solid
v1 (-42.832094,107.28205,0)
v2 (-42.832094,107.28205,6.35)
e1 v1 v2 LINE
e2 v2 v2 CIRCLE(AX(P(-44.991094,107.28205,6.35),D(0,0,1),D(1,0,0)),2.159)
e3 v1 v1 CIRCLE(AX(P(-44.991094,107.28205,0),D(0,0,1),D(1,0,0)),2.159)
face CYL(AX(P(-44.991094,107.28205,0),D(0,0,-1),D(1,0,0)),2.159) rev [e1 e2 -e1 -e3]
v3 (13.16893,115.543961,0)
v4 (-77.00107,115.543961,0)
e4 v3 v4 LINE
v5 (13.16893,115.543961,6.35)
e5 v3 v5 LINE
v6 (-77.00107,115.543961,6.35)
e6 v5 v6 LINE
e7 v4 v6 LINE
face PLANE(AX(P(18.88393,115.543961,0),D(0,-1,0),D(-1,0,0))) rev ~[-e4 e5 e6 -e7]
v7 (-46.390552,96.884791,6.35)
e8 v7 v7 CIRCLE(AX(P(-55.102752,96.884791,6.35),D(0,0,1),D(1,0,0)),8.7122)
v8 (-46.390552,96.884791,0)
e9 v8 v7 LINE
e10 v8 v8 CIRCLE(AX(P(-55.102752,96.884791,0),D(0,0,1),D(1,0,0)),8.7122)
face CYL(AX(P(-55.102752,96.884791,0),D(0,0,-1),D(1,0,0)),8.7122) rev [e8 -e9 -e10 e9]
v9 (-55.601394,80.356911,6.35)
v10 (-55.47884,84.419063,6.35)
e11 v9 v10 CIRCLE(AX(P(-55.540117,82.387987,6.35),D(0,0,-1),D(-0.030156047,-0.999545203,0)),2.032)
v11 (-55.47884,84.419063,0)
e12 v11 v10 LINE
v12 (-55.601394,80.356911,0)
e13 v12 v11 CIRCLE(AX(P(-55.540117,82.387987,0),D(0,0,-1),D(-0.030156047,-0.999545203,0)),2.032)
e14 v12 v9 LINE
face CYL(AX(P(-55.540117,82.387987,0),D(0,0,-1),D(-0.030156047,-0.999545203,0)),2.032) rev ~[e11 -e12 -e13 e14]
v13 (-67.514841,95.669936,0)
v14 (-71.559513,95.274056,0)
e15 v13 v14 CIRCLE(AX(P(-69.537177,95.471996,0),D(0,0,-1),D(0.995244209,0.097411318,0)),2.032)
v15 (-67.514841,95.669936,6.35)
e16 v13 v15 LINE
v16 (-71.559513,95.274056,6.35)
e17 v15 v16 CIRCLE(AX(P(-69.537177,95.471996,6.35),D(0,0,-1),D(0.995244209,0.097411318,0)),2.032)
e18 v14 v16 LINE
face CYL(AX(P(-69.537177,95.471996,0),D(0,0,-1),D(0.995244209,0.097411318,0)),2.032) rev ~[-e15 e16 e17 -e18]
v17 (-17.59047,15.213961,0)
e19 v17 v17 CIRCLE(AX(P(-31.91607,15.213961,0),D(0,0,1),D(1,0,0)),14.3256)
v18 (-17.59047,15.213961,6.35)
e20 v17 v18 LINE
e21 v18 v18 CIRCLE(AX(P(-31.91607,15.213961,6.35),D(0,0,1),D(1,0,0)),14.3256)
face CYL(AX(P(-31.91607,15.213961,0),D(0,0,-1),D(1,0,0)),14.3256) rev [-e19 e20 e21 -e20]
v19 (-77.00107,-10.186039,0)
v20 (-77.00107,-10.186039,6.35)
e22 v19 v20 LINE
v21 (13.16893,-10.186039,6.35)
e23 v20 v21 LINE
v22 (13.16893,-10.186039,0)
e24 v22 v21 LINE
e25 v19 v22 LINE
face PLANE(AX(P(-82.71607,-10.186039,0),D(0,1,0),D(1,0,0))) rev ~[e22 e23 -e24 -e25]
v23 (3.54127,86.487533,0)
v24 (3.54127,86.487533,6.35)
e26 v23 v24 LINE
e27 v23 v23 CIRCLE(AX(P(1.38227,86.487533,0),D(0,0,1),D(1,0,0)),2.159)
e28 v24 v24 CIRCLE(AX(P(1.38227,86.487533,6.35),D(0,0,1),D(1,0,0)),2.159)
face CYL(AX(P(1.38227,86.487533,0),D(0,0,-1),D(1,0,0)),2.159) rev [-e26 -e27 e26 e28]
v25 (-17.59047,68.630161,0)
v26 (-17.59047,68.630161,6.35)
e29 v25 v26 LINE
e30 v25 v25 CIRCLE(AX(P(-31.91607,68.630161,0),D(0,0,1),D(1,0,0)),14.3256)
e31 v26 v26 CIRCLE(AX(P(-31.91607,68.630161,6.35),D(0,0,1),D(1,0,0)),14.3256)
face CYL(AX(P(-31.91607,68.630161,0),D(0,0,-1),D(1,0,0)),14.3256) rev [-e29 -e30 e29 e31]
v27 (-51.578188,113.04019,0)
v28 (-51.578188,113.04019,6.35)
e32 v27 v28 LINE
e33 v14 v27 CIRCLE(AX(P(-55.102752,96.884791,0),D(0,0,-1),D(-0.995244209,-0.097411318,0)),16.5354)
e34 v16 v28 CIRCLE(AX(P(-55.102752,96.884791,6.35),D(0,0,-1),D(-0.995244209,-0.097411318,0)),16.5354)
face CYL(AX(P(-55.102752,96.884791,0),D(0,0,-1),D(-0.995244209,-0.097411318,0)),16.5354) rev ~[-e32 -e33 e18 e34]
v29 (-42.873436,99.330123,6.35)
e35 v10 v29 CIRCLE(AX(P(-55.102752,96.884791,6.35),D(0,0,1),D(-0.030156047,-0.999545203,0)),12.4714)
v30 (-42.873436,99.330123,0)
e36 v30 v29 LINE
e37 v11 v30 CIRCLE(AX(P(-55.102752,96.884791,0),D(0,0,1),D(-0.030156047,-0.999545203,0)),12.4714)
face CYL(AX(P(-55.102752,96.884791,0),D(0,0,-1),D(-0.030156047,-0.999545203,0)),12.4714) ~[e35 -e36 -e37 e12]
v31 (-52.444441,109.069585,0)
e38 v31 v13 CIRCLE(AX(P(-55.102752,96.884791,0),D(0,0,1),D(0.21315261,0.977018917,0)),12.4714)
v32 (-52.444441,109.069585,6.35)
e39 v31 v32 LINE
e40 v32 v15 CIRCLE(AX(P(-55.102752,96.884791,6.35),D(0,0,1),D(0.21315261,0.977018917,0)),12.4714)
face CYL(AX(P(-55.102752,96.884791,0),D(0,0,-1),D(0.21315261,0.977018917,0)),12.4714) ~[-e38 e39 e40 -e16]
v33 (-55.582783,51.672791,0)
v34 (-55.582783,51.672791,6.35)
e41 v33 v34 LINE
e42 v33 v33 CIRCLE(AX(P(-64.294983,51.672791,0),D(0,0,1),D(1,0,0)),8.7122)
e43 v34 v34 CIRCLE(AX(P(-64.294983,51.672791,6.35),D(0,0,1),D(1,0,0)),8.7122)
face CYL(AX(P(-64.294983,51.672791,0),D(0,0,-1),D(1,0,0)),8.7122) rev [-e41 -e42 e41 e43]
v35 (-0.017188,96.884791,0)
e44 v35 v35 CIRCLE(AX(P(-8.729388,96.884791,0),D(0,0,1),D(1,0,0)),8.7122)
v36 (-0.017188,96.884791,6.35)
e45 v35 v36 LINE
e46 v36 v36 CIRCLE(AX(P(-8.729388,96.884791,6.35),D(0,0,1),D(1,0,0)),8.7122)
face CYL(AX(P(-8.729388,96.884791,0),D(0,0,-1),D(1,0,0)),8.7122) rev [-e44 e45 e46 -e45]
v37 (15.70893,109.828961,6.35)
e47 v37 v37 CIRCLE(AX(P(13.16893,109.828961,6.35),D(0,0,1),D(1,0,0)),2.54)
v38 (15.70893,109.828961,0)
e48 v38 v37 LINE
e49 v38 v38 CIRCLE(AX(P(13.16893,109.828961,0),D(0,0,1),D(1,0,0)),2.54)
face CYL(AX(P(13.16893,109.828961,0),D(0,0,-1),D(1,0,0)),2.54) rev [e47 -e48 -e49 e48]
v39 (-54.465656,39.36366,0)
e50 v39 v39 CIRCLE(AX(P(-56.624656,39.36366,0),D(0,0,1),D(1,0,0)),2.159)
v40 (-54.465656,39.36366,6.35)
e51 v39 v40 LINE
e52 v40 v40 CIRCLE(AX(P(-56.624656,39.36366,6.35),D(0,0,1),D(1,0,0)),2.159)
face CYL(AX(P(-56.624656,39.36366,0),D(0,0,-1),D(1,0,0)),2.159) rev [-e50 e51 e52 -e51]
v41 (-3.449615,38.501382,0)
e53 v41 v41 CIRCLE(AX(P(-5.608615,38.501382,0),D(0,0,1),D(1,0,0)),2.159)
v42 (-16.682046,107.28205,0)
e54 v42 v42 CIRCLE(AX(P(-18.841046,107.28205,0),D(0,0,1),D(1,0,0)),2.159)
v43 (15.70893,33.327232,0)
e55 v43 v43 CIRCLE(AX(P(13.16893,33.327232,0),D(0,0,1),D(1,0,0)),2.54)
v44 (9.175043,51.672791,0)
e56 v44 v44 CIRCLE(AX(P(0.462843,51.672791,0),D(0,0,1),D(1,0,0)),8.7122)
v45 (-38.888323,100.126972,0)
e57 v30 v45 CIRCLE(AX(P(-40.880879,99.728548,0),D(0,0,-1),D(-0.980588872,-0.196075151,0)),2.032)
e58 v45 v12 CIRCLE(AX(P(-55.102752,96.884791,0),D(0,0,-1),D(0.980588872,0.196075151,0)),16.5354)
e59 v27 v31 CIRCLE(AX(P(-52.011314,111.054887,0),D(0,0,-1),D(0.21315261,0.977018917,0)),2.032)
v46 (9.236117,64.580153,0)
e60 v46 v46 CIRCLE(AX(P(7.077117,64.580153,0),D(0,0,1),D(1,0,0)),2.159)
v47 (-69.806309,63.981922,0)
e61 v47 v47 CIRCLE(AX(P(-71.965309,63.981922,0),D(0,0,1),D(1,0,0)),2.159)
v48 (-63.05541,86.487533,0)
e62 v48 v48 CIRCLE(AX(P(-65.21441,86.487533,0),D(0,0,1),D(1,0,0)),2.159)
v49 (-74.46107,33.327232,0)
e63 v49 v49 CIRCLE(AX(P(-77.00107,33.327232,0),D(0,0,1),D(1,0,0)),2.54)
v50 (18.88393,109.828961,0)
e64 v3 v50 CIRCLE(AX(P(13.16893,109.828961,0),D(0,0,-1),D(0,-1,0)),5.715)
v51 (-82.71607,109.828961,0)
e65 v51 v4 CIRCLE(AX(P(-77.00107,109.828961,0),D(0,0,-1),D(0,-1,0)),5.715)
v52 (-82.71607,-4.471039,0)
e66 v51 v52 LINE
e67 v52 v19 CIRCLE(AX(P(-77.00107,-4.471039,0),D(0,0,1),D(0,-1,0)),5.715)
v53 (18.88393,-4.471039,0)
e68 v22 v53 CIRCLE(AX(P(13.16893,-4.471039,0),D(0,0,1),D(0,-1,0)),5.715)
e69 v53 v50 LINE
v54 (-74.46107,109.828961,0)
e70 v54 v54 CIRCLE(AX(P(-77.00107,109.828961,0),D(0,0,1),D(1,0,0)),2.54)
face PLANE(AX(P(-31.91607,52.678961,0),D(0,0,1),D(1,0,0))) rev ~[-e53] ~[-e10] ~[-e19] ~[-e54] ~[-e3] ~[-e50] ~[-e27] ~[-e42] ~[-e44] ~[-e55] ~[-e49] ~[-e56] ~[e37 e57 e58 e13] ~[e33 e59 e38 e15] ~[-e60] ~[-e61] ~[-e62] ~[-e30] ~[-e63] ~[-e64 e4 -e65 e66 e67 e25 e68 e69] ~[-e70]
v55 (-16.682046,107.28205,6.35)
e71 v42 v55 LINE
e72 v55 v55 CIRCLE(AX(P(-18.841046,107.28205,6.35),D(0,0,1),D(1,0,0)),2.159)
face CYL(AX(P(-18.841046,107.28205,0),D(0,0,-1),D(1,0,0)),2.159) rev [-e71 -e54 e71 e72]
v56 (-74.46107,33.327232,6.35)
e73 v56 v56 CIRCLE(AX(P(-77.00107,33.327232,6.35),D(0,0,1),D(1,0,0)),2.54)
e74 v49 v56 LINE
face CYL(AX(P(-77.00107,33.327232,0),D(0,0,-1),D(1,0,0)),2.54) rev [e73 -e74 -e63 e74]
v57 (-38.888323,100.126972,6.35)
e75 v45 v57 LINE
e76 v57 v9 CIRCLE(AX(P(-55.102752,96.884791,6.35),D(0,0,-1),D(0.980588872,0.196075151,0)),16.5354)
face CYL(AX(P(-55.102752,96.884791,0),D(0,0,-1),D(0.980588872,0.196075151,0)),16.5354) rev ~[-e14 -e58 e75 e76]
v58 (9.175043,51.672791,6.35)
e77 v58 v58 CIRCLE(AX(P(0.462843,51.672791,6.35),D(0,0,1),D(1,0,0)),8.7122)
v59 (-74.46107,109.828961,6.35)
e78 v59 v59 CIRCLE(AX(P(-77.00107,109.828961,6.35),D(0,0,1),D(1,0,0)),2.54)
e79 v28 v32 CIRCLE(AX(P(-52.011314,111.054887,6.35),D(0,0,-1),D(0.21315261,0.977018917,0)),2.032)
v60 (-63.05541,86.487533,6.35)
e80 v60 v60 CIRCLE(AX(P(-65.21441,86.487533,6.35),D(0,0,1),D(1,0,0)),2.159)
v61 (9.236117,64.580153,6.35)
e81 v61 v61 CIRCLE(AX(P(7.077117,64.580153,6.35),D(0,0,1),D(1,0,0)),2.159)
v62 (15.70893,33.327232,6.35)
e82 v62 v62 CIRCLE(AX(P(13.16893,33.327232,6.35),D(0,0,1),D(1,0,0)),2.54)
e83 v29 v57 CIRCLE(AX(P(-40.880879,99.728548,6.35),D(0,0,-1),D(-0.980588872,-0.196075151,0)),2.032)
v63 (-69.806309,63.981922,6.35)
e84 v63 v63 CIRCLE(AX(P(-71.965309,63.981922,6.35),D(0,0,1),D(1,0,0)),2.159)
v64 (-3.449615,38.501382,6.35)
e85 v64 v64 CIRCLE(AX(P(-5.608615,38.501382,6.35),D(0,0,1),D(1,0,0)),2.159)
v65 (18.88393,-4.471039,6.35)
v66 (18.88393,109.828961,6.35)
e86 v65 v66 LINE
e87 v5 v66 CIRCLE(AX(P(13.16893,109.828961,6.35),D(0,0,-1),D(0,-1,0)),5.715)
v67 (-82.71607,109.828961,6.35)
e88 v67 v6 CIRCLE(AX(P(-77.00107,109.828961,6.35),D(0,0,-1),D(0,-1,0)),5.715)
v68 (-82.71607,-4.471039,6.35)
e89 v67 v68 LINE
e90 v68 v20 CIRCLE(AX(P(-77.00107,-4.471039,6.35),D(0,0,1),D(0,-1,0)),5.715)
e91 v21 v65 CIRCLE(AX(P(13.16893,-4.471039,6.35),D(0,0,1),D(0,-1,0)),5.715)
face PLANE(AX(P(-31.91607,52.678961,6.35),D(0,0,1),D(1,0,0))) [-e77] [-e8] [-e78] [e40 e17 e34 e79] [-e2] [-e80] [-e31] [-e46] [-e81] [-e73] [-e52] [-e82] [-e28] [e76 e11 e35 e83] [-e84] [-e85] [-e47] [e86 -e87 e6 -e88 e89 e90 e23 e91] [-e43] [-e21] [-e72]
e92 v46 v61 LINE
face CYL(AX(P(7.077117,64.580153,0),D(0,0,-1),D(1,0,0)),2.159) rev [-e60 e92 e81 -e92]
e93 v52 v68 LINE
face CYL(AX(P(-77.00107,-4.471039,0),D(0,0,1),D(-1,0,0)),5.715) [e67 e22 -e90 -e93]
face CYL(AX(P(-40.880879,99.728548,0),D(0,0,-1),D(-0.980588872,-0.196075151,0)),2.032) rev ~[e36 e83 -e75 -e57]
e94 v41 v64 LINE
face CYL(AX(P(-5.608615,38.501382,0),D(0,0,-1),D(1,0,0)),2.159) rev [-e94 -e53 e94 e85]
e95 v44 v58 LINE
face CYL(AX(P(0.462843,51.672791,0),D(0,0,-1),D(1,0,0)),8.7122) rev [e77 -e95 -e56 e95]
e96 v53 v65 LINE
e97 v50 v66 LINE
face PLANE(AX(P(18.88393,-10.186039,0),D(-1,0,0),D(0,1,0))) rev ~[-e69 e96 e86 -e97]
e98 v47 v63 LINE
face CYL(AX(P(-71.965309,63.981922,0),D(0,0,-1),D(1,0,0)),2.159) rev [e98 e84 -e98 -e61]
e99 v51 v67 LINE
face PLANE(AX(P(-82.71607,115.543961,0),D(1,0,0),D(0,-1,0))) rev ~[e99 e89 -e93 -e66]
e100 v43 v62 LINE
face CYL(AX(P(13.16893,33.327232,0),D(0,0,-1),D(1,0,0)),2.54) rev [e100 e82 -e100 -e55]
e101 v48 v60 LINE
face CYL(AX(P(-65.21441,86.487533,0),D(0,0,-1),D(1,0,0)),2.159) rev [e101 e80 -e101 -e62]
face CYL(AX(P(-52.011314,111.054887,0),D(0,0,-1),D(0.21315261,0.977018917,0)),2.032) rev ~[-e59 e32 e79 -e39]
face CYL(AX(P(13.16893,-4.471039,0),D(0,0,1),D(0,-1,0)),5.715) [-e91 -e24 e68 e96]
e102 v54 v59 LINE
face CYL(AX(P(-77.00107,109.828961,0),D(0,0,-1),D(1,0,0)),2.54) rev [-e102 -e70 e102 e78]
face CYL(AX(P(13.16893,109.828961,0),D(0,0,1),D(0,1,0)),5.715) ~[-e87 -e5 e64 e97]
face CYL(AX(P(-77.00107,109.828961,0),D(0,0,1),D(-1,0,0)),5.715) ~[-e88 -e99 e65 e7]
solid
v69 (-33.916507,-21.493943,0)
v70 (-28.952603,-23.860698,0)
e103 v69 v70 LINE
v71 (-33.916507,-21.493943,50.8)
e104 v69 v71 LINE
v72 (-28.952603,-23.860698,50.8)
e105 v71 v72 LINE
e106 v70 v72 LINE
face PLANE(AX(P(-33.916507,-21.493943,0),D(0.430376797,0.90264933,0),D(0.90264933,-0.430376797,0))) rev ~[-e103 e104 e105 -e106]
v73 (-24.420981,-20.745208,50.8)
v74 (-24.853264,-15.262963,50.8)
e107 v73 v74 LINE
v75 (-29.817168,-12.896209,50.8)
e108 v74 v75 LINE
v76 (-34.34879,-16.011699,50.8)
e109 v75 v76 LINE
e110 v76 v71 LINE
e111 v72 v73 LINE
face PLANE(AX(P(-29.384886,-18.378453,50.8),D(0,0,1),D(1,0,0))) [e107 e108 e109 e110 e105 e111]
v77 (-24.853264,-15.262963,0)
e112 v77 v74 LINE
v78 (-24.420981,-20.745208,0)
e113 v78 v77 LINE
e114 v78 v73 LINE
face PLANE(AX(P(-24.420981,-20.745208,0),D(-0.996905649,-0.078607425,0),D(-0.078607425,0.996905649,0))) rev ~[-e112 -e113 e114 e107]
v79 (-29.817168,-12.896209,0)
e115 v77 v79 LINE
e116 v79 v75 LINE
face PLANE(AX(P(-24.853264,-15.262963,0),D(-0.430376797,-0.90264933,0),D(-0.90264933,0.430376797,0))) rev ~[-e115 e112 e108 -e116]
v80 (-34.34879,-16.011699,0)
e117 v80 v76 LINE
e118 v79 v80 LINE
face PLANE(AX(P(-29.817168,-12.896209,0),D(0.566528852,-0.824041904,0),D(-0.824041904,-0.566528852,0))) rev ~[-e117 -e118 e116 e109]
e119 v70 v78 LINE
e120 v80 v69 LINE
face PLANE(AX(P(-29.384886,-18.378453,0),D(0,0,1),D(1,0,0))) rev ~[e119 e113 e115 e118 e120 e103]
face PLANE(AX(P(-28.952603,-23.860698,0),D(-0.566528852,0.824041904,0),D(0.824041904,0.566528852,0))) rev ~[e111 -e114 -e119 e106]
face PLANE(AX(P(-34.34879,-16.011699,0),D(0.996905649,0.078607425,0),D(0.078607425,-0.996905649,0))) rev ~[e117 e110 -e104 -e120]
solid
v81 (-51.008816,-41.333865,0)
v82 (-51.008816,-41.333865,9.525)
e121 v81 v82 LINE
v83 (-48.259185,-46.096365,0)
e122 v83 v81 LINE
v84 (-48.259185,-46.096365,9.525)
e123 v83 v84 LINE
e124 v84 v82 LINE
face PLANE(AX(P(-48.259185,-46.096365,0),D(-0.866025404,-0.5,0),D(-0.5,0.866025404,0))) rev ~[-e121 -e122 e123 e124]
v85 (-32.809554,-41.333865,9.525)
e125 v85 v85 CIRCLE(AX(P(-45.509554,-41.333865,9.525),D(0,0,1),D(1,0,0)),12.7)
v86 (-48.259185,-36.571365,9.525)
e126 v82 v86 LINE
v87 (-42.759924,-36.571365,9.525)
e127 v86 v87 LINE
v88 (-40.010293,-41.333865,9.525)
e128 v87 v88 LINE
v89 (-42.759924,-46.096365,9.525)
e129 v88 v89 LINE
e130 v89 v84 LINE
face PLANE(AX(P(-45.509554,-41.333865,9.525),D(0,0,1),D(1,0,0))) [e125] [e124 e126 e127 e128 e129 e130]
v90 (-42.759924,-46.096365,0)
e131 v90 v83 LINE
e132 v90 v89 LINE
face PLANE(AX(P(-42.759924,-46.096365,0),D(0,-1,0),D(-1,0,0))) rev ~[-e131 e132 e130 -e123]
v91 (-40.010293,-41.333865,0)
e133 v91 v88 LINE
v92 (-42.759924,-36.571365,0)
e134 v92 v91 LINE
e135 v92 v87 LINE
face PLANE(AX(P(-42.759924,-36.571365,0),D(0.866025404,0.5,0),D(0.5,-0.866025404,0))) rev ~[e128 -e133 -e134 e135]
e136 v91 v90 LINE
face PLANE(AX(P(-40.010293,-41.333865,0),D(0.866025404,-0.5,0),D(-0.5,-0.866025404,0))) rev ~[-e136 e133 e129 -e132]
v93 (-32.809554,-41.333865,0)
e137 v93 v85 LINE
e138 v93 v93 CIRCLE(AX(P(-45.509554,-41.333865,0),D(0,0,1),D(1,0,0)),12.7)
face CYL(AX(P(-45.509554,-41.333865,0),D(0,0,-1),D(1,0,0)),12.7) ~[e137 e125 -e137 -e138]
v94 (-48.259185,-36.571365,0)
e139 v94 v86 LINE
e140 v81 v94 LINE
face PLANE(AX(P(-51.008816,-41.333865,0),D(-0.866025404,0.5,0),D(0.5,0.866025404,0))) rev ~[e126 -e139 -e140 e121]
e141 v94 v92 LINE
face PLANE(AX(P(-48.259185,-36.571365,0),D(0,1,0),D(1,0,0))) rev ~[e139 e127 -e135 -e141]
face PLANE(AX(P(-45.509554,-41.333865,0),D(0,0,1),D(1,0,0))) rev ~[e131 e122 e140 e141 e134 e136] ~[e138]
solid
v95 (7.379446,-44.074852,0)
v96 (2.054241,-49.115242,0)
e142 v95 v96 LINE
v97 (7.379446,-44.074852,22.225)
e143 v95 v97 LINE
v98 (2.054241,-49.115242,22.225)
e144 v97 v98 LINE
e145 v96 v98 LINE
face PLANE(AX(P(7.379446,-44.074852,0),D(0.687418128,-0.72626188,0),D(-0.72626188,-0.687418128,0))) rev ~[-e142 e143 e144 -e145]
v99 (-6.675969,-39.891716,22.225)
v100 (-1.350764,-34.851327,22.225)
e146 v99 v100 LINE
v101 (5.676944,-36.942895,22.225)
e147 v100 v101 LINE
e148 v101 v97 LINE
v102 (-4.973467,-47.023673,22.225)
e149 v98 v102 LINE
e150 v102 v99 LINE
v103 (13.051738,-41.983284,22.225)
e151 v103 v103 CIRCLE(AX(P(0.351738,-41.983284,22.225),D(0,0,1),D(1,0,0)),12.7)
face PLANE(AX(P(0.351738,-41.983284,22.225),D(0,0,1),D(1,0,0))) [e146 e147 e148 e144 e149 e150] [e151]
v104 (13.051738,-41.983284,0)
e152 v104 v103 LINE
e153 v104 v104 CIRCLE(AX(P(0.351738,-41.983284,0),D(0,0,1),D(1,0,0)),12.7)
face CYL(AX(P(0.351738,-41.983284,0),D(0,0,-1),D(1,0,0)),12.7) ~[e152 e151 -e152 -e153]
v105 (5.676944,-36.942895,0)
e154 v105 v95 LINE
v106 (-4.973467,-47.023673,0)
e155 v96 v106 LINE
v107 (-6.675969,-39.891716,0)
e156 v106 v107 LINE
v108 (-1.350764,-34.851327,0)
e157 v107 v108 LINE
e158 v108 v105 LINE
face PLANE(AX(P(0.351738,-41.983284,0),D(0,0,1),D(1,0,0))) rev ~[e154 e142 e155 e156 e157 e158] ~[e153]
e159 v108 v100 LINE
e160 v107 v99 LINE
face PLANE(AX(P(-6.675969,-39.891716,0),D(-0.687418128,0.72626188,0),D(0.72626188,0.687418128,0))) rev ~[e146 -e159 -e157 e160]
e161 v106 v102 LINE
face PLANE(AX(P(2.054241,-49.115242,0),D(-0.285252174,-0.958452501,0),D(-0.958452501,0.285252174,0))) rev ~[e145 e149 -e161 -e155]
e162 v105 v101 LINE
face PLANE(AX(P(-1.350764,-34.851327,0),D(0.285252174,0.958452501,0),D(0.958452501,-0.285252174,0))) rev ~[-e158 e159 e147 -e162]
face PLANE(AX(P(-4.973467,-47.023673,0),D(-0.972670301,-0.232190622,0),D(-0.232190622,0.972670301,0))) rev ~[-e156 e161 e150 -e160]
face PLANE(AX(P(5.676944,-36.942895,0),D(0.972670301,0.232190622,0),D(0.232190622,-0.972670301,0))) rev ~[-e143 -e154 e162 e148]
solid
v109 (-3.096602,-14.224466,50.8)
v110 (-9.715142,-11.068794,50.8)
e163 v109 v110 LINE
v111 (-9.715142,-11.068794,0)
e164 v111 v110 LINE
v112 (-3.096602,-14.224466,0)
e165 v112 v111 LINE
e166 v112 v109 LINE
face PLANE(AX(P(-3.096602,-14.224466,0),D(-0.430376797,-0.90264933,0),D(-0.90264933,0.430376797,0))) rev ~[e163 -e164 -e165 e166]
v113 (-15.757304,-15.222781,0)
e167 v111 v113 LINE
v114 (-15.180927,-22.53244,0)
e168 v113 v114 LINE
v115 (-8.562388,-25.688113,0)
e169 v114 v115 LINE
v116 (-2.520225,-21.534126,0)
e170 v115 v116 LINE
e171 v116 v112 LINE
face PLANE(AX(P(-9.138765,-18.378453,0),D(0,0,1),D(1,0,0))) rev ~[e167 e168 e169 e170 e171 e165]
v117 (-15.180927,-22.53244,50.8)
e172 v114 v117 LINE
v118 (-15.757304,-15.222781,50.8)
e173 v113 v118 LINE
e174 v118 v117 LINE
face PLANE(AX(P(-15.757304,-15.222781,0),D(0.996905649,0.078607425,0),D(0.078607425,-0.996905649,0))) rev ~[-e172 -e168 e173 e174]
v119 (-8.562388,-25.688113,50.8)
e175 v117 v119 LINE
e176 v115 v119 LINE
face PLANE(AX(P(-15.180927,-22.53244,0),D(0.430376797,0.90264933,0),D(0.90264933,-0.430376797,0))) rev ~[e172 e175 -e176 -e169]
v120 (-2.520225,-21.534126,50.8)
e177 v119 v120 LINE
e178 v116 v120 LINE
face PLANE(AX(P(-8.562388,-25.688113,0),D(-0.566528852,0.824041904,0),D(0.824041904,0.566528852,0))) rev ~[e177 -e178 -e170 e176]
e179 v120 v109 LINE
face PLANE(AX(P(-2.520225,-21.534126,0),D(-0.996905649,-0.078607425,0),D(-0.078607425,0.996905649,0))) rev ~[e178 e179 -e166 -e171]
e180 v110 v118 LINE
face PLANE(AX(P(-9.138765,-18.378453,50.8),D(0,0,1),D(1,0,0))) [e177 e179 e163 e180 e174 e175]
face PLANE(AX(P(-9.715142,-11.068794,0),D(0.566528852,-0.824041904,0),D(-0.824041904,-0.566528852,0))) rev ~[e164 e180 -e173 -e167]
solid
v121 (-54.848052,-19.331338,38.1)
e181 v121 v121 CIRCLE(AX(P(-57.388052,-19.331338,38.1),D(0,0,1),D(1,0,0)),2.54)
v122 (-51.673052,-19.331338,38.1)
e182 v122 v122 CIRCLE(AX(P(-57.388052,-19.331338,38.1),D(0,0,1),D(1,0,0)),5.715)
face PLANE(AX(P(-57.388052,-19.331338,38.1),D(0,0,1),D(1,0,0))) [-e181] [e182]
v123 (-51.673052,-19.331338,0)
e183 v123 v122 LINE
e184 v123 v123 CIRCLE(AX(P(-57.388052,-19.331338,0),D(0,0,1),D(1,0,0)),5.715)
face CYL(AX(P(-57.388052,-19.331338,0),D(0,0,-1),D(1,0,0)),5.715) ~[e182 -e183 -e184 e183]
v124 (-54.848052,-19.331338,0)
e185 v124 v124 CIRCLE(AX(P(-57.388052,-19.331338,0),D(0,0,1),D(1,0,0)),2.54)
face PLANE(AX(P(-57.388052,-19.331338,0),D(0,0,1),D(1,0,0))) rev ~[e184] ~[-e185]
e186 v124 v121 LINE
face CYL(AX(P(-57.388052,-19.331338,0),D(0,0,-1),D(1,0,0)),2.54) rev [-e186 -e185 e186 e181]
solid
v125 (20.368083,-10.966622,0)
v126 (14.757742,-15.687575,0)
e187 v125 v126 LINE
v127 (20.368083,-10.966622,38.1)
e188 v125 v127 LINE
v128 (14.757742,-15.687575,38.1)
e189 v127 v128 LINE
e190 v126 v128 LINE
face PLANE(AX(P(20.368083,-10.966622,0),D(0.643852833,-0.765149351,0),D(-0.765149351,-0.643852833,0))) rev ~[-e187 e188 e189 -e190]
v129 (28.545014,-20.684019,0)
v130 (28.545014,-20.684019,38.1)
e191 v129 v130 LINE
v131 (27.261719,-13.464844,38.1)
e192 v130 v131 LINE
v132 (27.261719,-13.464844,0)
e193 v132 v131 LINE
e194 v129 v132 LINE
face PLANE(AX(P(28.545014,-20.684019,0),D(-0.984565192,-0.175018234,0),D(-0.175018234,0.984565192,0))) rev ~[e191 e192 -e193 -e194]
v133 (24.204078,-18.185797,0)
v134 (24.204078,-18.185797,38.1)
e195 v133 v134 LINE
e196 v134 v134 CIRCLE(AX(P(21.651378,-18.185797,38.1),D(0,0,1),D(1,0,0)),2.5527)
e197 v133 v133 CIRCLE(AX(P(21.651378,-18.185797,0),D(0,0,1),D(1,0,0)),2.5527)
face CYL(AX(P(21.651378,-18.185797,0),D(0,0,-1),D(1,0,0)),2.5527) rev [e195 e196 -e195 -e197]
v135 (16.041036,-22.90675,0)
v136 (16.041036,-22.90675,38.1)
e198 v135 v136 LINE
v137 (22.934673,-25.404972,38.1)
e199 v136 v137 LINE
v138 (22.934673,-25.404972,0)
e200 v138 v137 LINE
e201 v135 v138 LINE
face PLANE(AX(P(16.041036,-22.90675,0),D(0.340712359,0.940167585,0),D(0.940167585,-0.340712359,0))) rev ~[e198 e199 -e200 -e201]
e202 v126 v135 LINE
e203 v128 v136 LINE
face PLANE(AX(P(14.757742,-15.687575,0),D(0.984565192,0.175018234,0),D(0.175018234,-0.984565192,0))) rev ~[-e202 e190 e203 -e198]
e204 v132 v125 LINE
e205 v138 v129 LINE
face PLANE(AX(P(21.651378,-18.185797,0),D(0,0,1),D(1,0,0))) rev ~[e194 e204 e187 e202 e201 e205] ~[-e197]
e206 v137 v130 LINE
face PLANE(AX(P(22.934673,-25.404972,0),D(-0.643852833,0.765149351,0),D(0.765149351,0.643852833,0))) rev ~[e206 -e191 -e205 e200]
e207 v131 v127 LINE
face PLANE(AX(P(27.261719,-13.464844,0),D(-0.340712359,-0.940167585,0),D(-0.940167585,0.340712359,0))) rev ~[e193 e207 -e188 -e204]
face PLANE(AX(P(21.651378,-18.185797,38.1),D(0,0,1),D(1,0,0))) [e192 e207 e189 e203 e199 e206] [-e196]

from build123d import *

# Parameters (mm, degrees)
F0_R      = 14.3256
F0_R_2    = 2.54
F0_R_3    = 8.7122
F0_R_4    = 2.159
F1_DEPTH  = 6.35
F2_R      = 5.715
F2_R_2    = 2.54
F3_DEPTH  = 38.1
F5_DEPTH  = 50.8
F6_R      = 12.7
F7_DEPTH  = 9.525
F8_R      = 12.7
F9_DEPTH  = 22.225
F10_R     = 5.715
F11_R     = 2.5527
F12_DEPTH = 38.1


# Not quite as in the source:
# - a length typed as a fraction of an inch, garbled in the dataset ("3 / 203.2 mm" for 3/8 in), is restored


with BuildPart() as f1:
    # F0 (on Top) → F1 (new body)
    with BuildSketch(Plane.XY):
        Polygon((-82.716070006, 115.5439608428), (-82.716070006, 51.6727912001), (-82.716070006, -10.1860391572), (18.883929994, -10.1860391572), (18.883929994, 51.6727912001), (18.883929994, 115.5439608428), align=None)
        with Locations((-31.916070006, 15.2139608428)):
            Circle(F0_R, mode=Mode.SUBTRACT)
        with Locations((-77.001070006, 33.327232354)):
            Circle(F0_R_2, mode=Mode.SUBTRACT)
        with Locations((-64.2949825134, 51.6727912001)):
            Circle(F0_R_3, mode=Mode.SUBTRACT)
        with Locations((-56.6246563405, 39.3636601194)):
            Circle(F0_R_4, mode=Mode.SUBTRACT)
        with Locations((13.168929994, 33.327232354)):
            Circle(F0_R_2, mode=Mode.SUBTRACT)
        with Locations((-5.6086154291, 38.5013823857)):
            Circle(F0_R_4, mode=Mode.SUBTRACT)
        with Locations((0.4628425014, 51.6727912001)):
            Circle(F0_R_3, mode=Mode.SUBTRACT)
        with Locations((-71.9653086863, 63.9819222808)):
            Circle(F0_R_4, mode=Mode.SUBTRACT)
        with Locations((-31.916070006, 68.6301608428)):
            Circle(F0_R, mode=Mode.SUBTRACT)
        with Locations((-65.2144100543, 86.4875327271)):
            Circle(F0_R_4, mode=Mode.SUBTRACT)
        with Locations((-77.001070006, 109.8289608428)):
            Circle(F0_R_2, mode=Mode.SUBTRACT)
        with BuildLine():
            ThreePointArc((-71.5595131301, 95.2740560975), (-66.0899859638, 109.2419811661), (-51.5781883746, 113.0401898065))
            ThreePointArc((-51.5781883746, 113.0401898065), (-50.0260120377, 110.6217612632), (-52.4444405811, 109.0695849263))
            ThreePointArc((-52.4444405811, 109.0695849263), (-63.3895905293, 106.2048837858), (-67.5148406655, 95.6699356926))
            ThreePointArc((-67.5148406655, 95.6699356926), (-69.3392371002, 93.4496596627), (-71.5595131301, 95.2740560975))
        make_face(mode=Mode.SUBTRACT)
        with BuildLine():
            ThreePointArc((-38.8883228105, 100.1269722461), (-42.4749923158, 86.2096266807), (-55.6013943424, 80.3569114506))
            ThreePointArc((-55.6013943424, 80.3569114506), (-57.5711931069, 82.449264391), (-55.4788401666, 84.4190631556))
            ThreePointArc((-55.4788401666, 84.4190631556), (-45.5785891757, 88.8333230296), (-42.8734359851, 99.3301228339))
            ThreePointArc((-42.8734359851, 99.3301228339), (-41.279304104, 101.7211041273), (-38.8883228105, 100.1269722461))
        make_face(mode=Mode.SUBTRACT)
        with Locations((-55.1027520396, 96.8847912001)):
            Circle(F0_R_3, mode=Mode.SUBTRACT)
        with Locations((-44.991094025, 107.2820496732)):
            Circle(F0_R_4, mode=Mode.SUBTRACT)
        with Locations((7.0771174789, 64.5801525913)):
            Circle(F0_R_4, mode=Mode.SUBTRACT)
        with Locations((-8.7293879723, 96.8847912001)):
            Circle(F0_R_3, mode=Mode.SUBTRACT)
        with Locations((-18.841045987, 107.2820496732)):
            Circle(F0_R_4, mode=Mode.SUBTRACT)
        with Locations((1.3822700423, 86.4875327271)):
            Circle(F0_R_4, mode=Mode.SUBTRACT)
        with Locations((13.168929994, 109.8289608428)):
            Circle(F0_R_2, mode=Mode.SUBTRACT)
    extrude(amount=F1_DEPTH)

    # F10
    f10_edges = [f1.edges().sort_by_distance(p)[0] for p in [
        (-82.71607, 115.543961, 3.175),
        (18.88393, 115.543961, 3.175),
        (18.88393, -10.186039, 3.175),
        (-82.71607, -10.186039, 3.175),
    ]]
    fillet(f10_edges, radius=F10_R)


with BuildPart() as f3:
    # F2 (on Top) → F3 (new body)
    with BuildSketch(Plane.XY):
        with Locations((-57.3880523443, -19.3313378841)):
            Circle(F2_R)
        with Locations((-57.3880523443, -19.3313378841)):
            Circle(F2_R_2, mode=Mode.SUBTRACT)
    extrude(amount=F3_DEPTH)


with BuildPart() as f5:
    # F4 (on Top) → F5 (new body)
    with BuildSketch(Plane.XY):
        Polygon((-28.9526027861, -23.8606979485), (-24.4209810199, -20.7452077514), (-24.8532637928, -15.262963083), (-29.8171683318, -12.8962086117), (-34.348790098, -16.0116988088), (-33.9165073252, -21.4939434772), align=None)
    extrude(amount=F5_DEPTH)


with BuildPart() as f5b:
    # F4 (on Top) → F5, piece 2 (new body)
    with BuildSketch(Plane.XY):
        Polygon((-8.5623878158, -25.688112838), (-2.5202254609, -21.5341259085), (-3.0966024913, -14.2244663507), (-9.7151418767, -11.0687937222), (-15.7573042316, -15.2227806517), (-15.1809272012, -22.5324402096), align=None)
    extrude(amount=F5_DEPTH)


with BuildPart() as f7:
    # F6 (on Top) → F7 (new body)
    with BuildSketch(Plane.XY):
        with Locations((-45.5095544457, -41.3338653743)):
            Circle(F6_R)
        Polygon((-40.0102931317, -41.3338653743), (-42.7599237887, -46.0963653743), (-48.2591851028, -46.0963653743), (-51.0088157598, -41.3338653743), (-48.2591851028, -36.5713653743), (-42.7599237887, -36.5713653743), align=None, mode=Mode.SUBTRACT)
    extrude(amount=F7_DEPTH)


with BuildPart() as f9:
    # F8 (on Top) → F9 (new body)
    with BuildSketch(Plane.XY):
        with Locations((0.3517384175, -41.9832840562)):
            Circle(F8_R)
        Polygon((5.6769435627, -36.9428948356), (7.3794461001, -44.074852382), (2.0542409549, -49.1152416026), (-4.9734667277, -47.0236732768), (-6.6759692651, -39.8917157304), (-1.3507641199, -34.8513265098), align=None, mode=Mode.SUBTRACT)
    extrude(amount=F9_DEPTH)


with BuildPart() as f12:
    # F11 (on Top) → F12 (new body)
    with BuildSketch(Plane.XY):
        Polygon((22.934672502, -25.4049720947), (28.5450141377, -20.6840187943), (27.2617194673, -13.4648437637), (20.3680831612, -10.9666220335), (14.7577415256, -15.6875753339), (16.0410361959, -22.9067503645), align=None)
        with Locations((21.6513778316, -18.1857970641)):
            Circle(F11_R, mode=Mode.SUBTRACT)
    extrude(amount=F12_DEPTH)


solid = Compound([f1.part, f3.part, f5.part, f5b.part, f7.part, f9.part, f12.part])
